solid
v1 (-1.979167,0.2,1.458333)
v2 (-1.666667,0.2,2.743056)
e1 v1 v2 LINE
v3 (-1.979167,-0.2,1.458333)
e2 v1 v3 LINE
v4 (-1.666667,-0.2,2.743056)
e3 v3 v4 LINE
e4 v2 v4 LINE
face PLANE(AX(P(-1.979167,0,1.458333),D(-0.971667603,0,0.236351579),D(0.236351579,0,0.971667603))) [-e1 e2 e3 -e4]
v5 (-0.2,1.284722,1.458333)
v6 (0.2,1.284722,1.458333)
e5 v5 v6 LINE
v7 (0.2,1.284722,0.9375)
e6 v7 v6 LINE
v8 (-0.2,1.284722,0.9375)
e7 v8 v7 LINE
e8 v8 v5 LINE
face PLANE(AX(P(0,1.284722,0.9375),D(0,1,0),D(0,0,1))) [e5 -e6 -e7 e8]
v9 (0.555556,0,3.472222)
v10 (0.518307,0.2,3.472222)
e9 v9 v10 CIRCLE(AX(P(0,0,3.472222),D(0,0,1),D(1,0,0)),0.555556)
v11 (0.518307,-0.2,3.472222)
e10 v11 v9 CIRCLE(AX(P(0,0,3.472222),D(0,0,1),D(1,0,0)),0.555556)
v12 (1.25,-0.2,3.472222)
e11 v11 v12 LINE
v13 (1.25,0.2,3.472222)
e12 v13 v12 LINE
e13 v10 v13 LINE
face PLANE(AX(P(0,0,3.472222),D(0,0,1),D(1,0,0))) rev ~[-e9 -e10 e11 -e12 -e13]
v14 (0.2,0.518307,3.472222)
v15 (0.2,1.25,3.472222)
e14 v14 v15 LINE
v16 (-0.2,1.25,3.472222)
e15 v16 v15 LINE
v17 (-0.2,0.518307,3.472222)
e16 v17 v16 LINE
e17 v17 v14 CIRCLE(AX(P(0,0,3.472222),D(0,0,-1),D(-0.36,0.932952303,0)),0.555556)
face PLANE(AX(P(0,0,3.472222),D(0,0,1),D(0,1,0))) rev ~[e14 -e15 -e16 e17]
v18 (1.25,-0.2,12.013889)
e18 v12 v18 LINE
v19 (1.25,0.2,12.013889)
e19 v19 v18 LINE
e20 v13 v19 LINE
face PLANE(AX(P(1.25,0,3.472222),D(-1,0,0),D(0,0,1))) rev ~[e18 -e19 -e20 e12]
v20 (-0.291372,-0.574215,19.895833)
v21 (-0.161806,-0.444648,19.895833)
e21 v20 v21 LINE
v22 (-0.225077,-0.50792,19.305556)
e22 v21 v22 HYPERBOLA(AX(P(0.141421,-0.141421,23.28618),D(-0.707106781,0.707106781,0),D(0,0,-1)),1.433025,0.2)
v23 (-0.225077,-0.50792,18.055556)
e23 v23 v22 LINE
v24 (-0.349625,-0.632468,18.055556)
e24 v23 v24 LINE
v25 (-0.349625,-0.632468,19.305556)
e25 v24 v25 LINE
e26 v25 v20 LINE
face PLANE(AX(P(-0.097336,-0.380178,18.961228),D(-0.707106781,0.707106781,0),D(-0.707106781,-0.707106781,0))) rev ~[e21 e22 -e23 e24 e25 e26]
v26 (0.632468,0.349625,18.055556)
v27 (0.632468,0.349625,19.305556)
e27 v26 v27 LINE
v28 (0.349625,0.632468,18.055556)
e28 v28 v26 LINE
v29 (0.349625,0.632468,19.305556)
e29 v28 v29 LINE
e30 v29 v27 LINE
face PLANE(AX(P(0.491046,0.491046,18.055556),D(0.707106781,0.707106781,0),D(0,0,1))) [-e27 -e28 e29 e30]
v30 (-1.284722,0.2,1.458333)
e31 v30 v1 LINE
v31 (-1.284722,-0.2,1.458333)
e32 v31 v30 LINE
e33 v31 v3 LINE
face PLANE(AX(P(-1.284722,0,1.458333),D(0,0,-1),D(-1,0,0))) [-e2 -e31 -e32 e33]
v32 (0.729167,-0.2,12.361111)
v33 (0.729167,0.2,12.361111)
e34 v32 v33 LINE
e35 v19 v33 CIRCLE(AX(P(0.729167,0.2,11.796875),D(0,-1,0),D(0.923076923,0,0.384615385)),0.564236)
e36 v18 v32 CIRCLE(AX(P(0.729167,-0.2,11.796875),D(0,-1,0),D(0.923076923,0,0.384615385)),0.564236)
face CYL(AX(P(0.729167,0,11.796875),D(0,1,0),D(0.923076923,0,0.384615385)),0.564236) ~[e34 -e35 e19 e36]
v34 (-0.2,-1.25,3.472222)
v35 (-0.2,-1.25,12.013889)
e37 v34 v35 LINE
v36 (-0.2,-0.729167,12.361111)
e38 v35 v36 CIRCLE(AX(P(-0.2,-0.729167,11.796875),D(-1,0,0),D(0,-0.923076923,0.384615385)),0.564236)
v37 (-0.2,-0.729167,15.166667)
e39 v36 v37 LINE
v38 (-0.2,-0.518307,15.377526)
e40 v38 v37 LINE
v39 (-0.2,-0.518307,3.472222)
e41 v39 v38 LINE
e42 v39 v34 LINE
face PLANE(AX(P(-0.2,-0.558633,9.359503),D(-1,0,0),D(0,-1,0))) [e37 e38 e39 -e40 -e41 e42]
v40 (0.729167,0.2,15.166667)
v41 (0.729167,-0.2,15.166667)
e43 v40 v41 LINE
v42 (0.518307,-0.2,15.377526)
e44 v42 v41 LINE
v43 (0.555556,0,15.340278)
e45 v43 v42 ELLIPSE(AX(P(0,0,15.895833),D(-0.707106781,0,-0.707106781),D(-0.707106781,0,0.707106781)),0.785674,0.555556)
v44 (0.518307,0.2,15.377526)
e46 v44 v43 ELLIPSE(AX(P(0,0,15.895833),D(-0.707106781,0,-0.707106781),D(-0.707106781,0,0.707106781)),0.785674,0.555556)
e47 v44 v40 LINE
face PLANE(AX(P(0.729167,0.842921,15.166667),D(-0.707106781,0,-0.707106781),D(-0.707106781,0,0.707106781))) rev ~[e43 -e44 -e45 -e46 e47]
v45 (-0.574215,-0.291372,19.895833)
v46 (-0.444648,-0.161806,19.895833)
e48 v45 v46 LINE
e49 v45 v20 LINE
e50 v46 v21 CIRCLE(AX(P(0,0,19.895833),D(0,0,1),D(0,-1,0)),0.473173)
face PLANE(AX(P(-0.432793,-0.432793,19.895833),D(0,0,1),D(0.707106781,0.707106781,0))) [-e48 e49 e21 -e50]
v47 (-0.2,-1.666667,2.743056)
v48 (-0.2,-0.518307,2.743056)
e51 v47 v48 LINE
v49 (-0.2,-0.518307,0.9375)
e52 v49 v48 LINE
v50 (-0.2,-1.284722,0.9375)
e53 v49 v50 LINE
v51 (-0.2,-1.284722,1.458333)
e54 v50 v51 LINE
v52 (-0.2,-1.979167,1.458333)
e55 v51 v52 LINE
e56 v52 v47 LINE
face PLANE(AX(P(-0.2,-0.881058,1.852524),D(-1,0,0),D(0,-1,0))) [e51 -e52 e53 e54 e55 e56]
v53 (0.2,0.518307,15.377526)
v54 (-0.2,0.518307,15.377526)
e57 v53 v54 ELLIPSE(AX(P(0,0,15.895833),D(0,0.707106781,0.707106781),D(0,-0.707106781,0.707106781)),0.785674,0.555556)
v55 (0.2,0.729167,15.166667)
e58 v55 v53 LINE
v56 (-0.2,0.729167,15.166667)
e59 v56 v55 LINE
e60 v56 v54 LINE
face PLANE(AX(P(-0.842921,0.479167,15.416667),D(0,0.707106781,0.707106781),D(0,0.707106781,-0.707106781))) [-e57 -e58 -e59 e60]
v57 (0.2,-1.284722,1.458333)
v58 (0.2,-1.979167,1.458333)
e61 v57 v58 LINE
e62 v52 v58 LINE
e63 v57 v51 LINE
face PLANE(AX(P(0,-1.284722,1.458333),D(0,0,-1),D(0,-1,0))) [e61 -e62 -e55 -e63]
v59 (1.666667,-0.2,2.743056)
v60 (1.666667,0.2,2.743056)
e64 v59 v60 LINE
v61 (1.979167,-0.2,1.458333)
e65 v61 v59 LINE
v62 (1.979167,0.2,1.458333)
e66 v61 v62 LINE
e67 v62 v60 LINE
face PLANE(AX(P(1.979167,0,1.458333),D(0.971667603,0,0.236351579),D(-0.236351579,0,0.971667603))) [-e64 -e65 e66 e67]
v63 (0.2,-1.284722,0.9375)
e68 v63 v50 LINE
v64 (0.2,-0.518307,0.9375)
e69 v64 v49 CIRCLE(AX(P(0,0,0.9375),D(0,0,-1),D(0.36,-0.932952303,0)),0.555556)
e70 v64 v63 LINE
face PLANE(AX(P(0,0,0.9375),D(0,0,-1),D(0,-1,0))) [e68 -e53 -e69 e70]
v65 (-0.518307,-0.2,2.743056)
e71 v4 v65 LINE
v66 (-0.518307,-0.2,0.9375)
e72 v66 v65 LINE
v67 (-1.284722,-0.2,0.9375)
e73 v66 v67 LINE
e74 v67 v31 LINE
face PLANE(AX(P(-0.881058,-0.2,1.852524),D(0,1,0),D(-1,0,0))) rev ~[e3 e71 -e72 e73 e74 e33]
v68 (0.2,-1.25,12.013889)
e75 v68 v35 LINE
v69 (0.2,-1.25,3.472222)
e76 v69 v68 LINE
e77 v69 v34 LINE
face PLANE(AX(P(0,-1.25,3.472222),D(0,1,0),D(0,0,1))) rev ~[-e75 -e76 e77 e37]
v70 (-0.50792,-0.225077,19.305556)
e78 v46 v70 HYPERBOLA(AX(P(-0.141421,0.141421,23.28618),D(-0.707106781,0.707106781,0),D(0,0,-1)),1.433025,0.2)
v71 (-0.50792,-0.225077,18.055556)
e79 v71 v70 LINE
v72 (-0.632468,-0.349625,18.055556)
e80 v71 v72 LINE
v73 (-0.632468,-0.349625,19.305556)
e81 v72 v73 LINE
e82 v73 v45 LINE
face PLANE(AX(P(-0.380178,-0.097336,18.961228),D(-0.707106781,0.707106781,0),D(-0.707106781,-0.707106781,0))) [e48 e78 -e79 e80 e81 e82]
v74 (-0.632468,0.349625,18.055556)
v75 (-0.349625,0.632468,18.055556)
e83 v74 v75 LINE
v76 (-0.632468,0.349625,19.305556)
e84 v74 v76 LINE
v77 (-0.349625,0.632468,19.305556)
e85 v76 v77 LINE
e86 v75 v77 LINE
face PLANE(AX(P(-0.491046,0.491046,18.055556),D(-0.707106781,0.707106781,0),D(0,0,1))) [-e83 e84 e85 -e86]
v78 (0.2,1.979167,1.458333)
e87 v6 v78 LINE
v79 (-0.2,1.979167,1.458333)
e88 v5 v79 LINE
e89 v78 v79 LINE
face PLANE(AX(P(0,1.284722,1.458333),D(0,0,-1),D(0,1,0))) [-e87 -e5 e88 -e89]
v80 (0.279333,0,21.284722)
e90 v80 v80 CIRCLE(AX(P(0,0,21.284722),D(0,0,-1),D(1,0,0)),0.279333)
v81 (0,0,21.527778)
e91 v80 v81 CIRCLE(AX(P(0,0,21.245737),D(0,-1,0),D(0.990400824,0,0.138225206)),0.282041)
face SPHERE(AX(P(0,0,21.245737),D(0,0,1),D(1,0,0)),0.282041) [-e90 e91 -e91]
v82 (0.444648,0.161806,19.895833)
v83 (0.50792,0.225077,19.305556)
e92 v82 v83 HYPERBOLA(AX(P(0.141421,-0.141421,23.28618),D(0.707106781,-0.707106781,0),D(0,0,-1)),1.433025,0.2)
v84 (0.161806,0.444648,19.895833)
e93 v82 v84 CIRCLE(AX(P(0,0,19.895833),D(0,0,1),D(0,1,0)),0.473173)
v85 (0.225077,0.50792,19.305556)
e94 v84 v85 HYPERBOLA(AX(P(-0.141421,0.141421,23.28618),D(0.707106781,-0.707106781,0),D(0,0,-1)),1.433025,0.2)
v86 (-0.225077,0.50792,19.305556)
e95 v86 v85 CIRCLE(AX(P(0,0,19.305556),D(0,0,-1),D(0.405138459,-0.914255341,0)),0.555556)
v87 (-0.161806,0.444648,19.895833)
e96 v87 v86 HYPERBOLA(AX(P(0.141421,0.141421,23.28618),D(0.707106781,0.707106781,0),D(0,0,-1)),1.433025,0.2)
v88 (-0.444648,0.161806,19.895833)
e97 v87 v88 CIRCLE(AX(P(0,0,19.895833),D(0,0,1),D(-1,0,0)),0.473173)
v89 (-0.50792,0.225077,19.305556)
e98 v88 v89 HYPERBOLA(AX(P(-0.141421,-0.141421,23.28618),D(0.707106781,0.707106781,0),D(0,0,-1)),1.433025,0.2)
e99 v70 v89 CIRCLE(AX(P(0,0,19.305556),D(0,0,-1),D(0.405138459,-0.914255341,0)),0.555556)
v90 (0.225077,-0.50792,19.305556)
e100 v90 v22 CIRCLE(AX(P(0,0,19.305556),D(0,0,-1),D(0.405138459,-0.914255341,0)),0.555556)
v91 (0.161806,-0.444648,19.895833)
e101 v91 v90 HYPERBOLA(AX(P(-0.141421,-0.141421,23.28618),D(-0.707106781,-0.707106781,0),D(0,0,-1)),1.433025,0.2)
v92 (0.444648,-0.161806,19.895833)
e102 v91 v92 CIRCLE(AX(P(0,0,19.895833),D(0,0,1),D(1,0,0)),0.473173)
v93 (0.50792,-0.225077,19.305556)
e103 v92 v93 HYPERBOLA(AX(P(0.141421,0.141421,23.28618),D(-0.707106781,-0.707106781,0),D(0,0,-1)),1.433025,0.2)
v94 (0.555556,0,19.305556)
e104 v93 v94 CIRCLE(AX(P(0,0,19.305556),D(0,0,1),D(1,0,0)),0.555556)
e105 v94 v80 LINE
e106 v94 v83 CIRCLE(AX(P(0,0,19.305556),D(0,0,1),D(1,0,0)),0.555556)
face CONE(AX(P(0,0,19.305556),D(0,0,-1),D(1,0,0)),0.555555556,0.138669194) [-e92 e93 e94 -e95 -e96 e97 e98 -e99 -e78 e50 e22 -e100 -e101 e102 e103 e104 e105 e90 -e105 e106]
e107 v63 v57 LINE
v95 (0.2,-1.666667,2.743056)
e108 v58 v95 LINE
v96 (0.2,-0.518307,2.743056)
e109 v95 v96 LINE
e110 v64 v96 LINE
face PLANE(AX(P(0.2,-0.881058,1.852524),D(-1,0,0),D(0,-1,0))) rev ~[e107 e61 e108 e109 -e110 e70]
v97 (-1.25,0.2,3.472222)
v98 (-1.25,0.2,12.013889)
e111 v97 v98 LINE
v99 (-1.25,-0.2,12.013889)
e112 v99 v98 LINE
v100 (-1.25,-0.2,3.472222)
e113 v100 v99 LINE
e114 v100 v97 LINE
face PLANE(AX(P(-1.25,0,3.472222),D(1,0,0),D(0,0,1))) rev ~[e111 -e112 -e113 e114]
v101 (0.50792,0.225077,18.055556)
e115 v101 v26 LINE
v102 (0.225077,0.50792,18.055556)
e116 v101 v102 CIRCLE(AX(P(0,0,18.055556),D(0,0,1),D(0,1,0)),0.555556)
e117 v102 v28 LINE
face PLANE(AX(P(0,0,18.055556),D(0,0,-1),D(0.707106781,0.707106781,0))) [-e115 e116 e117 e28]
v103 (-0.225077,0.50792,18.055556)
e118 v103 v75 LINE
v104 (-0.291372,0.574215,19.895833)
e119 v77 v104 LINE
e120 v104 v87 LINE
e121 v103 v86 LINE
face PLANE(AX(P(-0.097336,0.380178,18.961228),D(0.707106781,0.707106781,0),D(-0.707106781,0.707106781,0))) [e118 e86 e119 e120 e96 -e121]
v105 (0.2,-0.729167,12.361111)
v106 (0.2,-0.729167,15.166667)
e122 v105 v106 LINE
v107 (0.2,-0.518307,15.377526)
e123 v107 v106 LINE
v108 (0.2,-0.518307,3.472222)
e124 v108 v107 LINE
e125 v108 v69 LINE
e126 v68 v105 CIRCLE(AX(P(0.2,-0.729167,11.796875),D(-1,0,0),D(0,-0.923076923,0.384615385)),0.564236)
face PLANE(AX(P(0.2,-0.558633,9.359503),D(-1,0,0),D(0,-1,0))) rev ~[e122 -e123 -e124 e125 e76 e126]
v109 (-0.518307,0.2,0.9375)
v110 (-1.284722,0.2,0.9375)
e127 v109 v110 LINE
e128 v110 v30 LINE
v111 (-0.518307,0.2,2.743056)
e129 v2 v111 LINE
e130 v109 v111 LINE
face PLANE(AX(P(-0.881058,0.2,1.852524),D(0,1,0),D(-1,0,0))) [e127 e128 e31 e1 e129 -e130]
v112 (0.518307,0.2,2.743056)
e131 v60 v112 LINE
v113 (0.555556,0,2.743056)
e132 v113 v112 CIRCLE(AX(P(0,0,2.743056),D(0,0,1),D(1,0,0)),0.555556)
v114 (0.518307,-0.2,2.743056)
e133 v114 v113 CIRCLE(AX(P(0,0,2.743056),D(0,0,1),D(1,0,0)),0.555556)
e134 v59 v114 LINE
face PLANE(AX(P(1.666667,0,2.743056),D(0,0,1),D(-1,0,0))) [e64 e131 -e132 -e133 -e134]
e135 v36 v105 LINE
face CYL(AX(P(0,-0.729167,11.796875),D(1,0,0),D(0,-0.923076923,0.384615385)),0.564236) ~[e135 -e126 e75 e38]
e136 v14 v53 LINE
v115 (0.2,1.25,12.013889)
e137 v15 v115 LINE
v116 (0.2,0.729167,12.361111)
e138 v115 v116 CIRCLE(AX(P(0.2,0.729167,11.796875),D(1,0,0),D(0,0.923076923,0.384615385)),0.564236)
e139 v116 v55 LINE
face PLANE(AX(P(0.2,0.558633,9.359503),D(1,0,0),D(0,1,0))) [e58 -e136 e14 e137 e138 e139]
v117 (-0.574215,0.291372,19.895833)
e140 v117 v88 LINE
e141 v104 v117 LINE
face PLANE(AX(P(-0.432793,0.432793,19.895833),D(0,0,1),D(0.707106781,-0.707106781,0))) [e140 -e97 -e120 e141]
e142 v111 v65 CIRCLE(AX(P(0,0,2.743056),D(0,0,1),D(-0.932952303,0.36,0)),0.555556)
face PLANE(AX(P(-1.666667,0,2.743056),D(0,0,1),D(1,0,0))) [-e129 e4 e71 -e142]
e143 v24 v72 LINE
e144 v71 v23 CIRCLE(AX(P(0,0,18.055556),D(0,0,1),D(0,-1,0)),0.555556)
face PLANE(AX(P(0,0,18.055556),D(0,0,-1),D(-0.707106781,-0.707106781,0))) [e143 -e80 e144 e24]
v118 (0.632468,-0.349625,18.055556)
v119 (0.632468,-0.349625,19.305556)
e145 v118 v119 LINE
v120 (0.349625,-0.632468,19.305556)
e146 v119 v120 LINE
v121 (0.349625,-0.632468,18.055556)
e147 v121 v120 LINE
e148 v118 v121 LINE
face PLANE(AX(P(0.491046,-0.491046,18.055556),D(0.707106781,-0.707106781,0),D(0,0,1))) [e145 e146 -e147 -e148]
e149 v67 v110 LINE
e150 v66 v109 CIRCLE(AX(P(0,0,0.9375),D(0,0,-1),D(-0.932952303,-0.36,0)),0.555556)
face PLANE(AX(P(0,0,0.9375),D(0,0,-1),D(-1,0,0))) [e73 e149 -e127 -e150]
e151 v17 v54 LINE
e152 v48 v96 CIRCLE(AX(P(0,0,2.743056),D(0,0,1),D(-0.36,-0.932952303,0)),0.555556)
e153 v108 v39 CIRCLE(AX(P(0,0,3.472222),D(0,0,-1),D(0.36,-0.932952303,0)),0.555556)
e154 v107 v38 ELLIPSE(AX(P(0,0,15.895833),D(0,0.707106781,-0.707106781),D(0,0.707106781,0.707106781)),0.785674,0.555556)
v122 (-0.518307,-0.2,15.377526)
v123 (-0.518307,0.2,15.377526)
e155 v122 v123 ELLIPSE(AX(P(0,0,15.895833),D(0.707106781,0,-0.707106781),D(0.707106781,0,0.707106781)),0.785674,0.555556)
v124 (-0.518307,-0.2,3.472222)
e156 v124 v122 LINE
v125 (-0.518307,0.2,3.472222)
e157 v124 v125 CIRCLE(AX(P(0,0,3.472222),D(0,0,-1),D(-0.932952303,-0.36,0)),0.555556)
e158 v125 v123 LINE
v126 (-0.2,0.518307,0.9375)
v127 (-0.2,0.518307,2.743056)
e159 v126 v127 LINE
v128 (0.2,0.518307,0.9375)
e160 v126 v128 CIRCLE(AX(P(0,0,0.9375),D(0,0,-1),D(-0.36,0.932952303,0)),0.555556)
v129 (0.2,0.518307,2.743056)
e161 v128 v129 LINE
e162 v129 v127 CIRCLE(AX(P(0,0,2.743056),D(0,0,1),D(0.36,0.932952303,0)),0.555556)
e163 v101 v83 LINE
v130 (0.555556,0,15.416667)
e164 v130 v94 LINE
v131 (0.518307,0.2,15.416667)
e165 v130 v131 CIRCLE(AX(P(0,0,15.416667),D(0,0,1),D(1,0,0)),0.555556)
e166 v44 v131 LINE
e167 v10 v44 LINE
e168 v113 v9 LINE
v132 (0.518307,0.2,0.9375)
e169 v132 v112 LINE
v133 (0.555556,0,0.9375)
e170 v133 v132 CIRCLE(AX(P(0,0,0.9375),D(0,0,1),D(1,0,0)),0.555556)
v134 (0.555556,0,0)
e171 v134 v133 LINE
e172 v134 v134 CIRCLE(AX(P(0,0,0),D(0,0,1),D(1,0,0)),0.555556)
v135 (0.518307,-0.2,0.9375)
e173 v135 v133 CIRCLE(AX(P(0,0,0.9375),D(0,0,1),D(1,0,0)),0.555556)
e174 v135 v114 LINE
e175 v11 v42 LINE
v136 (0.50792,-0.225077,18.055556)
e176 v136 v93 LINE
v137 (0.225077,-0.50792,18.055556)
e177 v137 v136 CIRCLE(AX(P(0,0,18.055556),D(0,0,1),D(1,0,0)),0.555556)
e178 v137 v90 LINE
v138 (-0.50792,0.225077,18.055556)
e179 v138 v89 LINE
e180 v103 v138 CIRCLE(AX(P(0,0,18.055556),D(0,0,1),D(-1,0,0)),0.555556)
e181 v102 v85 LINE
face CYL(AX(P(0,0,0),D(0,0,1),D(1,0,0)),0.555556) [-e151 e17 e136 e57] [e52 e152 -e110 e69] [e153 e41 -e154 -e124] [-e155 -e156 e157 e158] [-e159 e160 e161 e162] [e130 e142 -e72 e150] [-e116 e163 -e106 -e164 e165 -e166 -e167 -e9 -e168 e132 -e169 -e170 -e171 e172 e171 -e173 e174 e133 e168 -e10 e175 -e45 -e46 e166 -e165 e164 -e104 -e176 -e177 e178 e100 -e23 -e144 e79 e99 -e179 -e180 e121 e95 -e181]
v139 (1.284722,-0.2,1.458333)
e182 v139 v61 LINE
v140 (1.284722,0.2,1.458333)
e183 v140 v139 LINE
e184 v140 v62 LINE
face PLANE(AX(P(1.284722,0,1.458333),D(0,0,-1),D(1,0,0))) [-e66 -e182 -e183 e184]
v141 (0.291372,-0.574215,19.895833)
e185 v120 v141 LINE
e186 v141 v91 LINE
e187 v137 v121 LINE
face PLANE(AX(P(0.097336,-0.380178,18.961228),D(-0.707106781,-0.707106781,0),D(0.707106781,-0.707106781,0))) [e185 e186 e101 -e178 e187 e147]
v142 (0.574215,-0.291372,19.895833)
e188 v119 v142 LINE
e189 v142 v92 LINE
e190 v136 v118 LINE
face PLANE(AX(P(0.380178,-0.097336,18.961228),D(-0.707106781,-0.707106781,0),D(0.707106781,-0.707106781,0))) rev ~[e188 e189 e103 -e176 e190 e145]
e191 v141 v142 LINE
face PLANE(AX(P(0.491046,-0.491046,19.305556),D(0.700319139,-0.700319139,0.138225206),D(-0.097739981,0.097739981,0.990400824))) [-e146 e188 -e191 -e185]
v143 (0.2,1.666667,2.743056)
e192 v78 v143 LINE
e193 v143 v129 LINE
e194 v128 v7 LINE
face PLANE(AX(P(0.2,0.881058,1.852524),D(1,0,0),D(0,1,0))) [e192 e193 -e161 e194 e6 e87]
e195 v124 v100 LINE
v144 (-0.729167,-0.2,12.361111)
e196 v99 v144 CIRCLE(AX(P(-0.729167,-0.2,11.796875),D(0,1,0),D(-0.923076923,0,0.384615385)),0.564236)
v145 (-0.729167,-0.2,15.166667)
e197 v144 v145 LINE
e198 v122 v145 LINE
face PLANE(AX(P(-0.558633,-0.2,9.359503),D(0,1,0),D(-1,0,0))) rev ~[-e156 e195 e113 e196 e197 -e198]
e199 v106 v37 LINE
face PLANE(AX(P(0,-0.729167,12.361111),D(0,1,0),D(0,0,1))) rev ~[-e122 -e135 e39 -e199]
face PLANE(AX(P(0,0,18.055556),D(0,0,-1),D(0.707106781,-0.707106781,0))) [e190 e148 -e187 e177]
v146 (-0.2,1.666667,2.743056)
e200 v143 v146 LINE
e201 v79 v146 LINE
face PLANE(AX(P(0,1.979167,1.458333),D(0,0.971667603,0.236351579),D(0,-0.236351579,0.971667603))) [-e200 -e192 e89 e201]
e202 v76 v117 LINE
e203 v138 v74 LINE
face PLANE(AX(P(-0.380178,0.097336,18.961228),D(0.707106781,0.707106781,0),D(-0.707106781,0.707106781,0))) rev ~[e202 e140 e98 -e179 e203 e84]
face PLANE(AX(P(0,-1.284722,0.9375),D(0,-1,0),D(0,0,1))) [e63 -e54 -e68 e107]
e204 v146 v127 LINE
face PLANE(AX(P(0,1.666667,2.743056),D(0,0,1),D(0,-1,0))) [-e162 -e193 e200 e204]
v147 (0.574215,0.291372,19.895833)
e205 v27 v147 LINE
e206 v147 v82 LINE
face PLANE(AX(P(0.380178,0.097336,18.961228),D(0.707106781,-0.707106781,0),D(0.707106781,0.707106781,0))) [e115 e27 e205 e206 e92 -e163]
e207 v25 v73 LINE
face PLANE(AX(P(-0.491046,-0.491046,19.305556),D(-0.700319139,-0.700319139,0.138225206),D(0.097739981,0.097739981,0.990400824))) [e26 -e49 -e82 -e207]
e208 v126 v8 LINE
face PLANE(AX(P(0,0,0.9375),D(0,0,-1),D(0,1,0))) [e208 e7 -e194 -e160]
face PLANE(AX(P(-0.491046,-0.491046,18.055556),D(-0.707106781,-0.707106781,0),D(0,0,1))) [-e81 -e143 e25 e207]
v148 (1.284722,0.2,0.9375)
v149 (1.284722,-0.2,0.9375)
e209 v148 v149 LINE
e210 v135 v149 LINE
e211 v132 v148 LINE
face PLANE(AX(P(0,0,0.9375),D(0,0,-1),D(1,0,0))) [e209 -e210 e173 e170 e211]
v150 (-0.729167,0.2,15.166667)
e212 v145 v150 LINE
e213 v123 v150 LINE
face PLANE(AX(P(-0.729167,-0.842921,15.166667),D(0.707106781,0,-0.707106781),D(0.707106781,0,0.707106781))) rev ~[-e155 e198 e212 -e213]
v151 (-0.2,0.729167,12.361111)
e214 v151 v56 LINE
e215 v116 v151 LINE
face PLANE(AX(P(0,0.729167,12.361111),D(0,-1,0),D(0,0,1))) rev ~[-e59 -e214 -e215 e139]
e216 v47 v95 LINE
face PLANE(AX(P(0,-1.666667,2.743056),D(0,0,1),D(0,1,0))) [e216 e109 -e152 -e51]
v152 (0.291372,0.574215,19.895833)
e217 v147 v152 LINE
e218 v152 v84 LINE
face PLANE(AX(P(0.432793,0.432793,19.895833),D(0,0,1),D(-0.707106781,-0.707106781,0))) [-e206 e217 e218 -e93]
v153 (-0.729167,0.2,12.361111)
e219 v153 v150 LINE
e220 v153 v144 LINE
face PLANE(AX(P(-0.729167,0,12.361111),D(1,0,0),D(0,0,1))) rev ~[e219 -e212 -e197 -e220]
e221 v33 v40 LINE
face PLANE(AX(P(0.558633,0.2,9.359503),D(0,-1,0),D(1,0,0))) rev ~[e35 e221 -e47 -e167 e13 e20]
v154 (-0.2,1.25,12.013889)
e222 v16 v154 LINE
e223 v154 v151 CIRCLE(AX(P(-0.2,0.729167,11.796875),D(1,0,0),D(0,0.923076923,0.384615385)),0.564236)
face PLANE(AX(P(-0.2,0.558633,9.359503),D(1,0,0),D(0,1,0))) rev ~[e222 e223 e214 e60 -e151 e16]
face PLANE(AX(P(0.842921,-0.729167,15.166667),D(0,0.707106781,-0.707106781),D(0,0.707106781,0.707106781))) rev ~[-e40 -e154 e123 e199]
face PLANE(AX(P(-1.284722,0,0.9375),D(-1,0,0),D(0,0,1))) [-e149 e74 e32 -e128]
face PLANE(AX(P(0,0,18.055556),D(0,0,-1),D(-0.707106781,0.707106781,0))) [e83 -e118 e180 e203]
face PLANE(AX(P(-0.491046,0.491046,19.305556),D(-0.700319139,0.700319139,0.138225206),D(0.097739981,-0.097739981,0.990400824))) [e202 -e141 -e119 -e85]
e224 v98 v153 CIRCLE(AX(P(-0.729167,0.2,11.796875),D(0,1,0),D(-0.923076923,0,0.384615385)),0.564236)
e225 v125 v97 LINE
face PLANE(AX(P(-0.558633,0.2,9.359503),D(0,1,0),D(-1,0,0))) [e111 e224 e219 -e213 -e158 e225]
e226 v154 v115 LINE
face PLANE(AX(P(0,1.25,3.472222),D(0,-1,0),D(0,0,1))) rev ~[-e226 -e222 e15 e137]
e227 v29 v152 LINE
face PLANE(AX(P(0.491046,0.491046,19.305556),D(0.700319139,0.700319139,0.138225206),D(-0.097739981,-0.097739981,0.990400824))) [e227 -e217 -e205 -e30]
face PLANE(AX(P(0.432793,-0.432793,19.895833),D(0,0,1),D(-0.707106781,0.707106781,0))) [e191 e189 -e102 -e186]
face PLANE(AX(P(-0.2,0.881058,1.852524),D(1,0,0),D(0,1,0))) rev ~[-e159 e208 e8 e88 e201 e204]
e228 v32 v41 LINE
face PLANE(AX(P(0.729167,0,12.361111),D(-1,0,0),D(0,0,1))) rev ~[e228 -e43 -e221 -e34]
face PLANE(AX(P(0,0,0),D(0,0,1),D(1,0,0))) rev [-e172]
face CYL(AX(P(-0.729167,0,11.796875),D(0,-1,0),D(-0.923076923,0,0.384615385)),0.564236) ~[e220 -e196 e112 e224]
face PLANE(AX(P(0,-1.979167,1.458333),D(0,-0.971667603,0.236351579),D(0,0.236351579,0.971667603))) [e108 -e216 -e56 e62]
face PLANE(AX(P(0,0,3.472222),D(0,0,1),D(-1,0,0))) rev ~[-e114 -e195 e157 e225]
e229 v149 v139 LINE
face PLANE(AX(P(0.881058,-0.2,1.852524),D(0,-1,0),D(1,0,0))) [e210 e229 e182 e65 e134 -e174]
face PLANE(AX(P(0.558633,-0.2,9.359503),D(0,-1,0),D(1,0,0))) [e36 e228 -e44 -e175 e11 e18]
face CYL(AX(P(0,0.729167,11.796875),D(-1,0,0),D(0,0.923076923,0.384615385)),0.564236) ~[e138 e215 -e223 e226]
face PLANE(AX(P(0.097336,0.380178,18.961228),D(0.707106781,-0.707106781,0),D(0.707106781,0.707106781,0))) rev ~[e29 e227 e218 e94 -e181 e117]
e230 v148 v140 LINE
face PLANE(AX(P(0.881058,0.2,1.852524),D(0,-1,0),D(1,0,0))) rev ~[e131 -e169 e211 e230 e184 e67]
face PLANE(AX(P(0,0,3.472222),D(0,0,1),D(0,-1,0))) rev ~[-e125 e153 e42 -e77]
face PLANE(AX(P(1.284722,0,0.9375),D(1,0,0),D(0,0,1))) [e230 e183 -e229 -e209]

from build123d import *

# Parameters (mm, degrees)
F3_DEPTH     = 0.2
F6_DEPTH     = 0.2
F7_COUNT     = 4
F8_T4_DEPTH  = 1.685841494
F8_S5_R      = 0.5555555556
F8_T6_DEPTH  = 2
F8_T10_DEPTH = 1.685841494
F8_S11_R     = 0.5555555556
F8_T12_DEPTH = 2
F8_T16_DEPTH = 1.685841494
F8_S17_R     = 0.5555555556
F8_T18_DEPTH = 2
F8_T22_DEPTH = 1.685841494
F8_S23_R     = 0.5555555556
F8_T24_DEPTH = 2


# Not quite as in the source:
# - a fillet or chamfer that OpenCascade refuses, or shapes differently, is made with other operations: its cross-section is extruded or revolved along the edge and cut away or added
# - a feature names something its author has since deleted; it is built from what else it names


with BuildPart() as f1:
    # F0 (on Front) → F1 (revolve)
    with BuildSketch(Plane.XZ):
        with BuildLine():
            Line((0, 21.5277777778), (0, 0))
            Line((0, 0), (0.5555555556, 0))
            Line((0.5555555556, 0), (0.5555555556, 19.3055555556))
            Line((0.5555555556, 19.3055555556), (0.2793333296, 21.2847222222))
            ThreePointArc((0.2793333296, 21.2847222222), (0.185137187, 21.4585073218), (0, 21.5277777778))
        make_face()
    revolve(axis=Axis((0, 0, 10.7638888889), (0, 0, 1)))

    # F2 (on Front) → F3 (join, symmetric)
    with BuildSketch(Plane.XZ):
        with BuildLine():
            Line((0, 15.4166666667), (0, 3.4722222222))
            Line((0, 3.4722222222), (1.25, 3.4722222222))
            Line((1.25, 3.4722222222), (1.25, 12.0138888889))
            ThreePointArc((1.25, 12.0138888889), (1.0421485482, 12.2663478223), (0.7291666667, 12.3611111111))
            Line((0.7291666667, 12.3611111111), (0.7291666667, 15.4166666667))
            Line((0.7291666667, 15.4166666667), (0, 15.4166666667))
        make_face()
        Polygon((0, 2.7430555556), (0, 0.9375), (1.2847222222, 0.9375), (1.2847222222, 1.4583333333), (1.9791666667, 1.4583333333), (1.6666666667, 2.7430555556), align=None)
    extrude(amount=F3_DEPTH, both=True)

    # F5 (on face) → F6 (join, symmetric)
    with BuildSketch(Plane(origin=(0, 0, 0), x_dir=(0.7071067812, -0.7071067812, 0), z_dir=(-0.7071067812, -0.7071067812, 0))):
        Polygon((0, 19.3055555556), (0, 18.0555555556), (0.6944444444, 18.0555555556), (0.6944444444, 19.3055555556), (0.612062377, 19.8958333333), (0, 19.8958333333), align=None)
    extrude(amount=F6_DEPTH, both=True)

    # F7: F1 ×4 about axis
    f7_axis = Axis((0, 0, 0), (0, 0, 1))


with BuildPart() as f1_1:
    add(f1.part)
    for i in range(1, F7_COUNT):
        add(f1.part.rotate(f7_axis, i * 360 / F7_COUNT))

    # F8: chamfer of 0.25 on 4 edges, made by hand


with BuildPart() as f8_tool2:
    # F8_s3 → F8_t4 (new body)
    with BuildSketch(Plane.XZ.offset(0.842920747)):
        Polygon((-0.7291666667, 15.1666666667), (-0.4791666667, 15.4166666667), (-0.7291666667, 15.4166666667), align=None)
    extrude(amount=-F8_T4_DEPTH)

    # F8_s5 → F8_t6 (cut, symmetric)
    with BuildSketch(Plane.XY.offset(15.3)):
        Circle(F8_S5_R)
    extrude(amount=F8_T6_DEPTH, both=True, mode=Mode.SUBTRACT)


with BuildPart() as f1_2:
    add(f1_1.part)

    # F8_t1: cut F8_tool2
    add(f8_tool2.part, mode=Mode.SUBTRACT)


with BuildPart() as f8_tool8:
    # F8_s9 → F8_t10 (new body)
    with BuildSketch(Plane.YZ.offset(0.842920747)):
        Polygon((-0.7291666667, 15.1666666667), (-0.4791666667, 15.4166666667), (-0.7291666667, 15.4166666667), align=None)
    extrude(amount=-F8_T10_DEPTH)

    # F8_s11 → F8_t12 (cut, symmetric)
    with BuildSketch(Plane.XY.offset(15.3)):
        Circle(F8_S11_R)
    extrude(amount=F8_T12_DEPTH, both=True, mode=Mode.SUBTRACT)


with BuildPart() as f1_3:
    add(f1_2.part)

    # F8_t7: cut F8_tool8
    add(f8_tool8.part, mode=Mode.SUBTRACT)


with BuildPart() as f8_tool14:
    # F8_s15 → F8_t16 (new body)
    with BuildSketch(Plane.XZ.offset(-0.842920747)):
        Polygon((0.7291666667, 15.1666666667), (0.4791666667, 15.4166666667), (0.7291666667, 15.4166666667), align=None)
    extrude(amount=F8_T16_DEPTH)

    # F8_s17 → F8_t18 (cut, symmetric)
    with BuildSketch(Plane.XY.offset(15.3)):
        Circle(F8_S17_R)
    extrude(amount=F8_T18_DEPTH, both=True, mode=Mode.SUBTRACT)


with BuildPart() as f1_4:
    add(f1_3.part)

    # F8_t13: cut F8_tool14
    add(f8_tool14.part, mode=Mode.SUBTRACT)


with BuildPart() as f8_tool20:
    # F8_s21 → F8_t22 (new body)
    with BuildSketch(Plane.YZ.offset(-0.842920747)):
        Polygon((0.4791666667, 15.4166666667), (0.7291666667, 15.1666666667), (0.7291666667, 15.4166666667), align=None)
    extrude(amount=F8_T22_DEPTH)

    # F8_s23 → F8_t24 (cut, symmetric)
    with BuildSketch(Plane.XY.offset(15.3)):
        Circle(F8_S23_R)
    extrude(amount=F8_T24_DEPTH, both=True, mode=Mode.SUBTRACT)


with BuildPart() as f1_5:
    add(f1_4.part)

    # F8_t19: cut F8_tool20
    add(f8_tool20.part, mode=Mode.SUBTRACT)


solid = f1_5.part
